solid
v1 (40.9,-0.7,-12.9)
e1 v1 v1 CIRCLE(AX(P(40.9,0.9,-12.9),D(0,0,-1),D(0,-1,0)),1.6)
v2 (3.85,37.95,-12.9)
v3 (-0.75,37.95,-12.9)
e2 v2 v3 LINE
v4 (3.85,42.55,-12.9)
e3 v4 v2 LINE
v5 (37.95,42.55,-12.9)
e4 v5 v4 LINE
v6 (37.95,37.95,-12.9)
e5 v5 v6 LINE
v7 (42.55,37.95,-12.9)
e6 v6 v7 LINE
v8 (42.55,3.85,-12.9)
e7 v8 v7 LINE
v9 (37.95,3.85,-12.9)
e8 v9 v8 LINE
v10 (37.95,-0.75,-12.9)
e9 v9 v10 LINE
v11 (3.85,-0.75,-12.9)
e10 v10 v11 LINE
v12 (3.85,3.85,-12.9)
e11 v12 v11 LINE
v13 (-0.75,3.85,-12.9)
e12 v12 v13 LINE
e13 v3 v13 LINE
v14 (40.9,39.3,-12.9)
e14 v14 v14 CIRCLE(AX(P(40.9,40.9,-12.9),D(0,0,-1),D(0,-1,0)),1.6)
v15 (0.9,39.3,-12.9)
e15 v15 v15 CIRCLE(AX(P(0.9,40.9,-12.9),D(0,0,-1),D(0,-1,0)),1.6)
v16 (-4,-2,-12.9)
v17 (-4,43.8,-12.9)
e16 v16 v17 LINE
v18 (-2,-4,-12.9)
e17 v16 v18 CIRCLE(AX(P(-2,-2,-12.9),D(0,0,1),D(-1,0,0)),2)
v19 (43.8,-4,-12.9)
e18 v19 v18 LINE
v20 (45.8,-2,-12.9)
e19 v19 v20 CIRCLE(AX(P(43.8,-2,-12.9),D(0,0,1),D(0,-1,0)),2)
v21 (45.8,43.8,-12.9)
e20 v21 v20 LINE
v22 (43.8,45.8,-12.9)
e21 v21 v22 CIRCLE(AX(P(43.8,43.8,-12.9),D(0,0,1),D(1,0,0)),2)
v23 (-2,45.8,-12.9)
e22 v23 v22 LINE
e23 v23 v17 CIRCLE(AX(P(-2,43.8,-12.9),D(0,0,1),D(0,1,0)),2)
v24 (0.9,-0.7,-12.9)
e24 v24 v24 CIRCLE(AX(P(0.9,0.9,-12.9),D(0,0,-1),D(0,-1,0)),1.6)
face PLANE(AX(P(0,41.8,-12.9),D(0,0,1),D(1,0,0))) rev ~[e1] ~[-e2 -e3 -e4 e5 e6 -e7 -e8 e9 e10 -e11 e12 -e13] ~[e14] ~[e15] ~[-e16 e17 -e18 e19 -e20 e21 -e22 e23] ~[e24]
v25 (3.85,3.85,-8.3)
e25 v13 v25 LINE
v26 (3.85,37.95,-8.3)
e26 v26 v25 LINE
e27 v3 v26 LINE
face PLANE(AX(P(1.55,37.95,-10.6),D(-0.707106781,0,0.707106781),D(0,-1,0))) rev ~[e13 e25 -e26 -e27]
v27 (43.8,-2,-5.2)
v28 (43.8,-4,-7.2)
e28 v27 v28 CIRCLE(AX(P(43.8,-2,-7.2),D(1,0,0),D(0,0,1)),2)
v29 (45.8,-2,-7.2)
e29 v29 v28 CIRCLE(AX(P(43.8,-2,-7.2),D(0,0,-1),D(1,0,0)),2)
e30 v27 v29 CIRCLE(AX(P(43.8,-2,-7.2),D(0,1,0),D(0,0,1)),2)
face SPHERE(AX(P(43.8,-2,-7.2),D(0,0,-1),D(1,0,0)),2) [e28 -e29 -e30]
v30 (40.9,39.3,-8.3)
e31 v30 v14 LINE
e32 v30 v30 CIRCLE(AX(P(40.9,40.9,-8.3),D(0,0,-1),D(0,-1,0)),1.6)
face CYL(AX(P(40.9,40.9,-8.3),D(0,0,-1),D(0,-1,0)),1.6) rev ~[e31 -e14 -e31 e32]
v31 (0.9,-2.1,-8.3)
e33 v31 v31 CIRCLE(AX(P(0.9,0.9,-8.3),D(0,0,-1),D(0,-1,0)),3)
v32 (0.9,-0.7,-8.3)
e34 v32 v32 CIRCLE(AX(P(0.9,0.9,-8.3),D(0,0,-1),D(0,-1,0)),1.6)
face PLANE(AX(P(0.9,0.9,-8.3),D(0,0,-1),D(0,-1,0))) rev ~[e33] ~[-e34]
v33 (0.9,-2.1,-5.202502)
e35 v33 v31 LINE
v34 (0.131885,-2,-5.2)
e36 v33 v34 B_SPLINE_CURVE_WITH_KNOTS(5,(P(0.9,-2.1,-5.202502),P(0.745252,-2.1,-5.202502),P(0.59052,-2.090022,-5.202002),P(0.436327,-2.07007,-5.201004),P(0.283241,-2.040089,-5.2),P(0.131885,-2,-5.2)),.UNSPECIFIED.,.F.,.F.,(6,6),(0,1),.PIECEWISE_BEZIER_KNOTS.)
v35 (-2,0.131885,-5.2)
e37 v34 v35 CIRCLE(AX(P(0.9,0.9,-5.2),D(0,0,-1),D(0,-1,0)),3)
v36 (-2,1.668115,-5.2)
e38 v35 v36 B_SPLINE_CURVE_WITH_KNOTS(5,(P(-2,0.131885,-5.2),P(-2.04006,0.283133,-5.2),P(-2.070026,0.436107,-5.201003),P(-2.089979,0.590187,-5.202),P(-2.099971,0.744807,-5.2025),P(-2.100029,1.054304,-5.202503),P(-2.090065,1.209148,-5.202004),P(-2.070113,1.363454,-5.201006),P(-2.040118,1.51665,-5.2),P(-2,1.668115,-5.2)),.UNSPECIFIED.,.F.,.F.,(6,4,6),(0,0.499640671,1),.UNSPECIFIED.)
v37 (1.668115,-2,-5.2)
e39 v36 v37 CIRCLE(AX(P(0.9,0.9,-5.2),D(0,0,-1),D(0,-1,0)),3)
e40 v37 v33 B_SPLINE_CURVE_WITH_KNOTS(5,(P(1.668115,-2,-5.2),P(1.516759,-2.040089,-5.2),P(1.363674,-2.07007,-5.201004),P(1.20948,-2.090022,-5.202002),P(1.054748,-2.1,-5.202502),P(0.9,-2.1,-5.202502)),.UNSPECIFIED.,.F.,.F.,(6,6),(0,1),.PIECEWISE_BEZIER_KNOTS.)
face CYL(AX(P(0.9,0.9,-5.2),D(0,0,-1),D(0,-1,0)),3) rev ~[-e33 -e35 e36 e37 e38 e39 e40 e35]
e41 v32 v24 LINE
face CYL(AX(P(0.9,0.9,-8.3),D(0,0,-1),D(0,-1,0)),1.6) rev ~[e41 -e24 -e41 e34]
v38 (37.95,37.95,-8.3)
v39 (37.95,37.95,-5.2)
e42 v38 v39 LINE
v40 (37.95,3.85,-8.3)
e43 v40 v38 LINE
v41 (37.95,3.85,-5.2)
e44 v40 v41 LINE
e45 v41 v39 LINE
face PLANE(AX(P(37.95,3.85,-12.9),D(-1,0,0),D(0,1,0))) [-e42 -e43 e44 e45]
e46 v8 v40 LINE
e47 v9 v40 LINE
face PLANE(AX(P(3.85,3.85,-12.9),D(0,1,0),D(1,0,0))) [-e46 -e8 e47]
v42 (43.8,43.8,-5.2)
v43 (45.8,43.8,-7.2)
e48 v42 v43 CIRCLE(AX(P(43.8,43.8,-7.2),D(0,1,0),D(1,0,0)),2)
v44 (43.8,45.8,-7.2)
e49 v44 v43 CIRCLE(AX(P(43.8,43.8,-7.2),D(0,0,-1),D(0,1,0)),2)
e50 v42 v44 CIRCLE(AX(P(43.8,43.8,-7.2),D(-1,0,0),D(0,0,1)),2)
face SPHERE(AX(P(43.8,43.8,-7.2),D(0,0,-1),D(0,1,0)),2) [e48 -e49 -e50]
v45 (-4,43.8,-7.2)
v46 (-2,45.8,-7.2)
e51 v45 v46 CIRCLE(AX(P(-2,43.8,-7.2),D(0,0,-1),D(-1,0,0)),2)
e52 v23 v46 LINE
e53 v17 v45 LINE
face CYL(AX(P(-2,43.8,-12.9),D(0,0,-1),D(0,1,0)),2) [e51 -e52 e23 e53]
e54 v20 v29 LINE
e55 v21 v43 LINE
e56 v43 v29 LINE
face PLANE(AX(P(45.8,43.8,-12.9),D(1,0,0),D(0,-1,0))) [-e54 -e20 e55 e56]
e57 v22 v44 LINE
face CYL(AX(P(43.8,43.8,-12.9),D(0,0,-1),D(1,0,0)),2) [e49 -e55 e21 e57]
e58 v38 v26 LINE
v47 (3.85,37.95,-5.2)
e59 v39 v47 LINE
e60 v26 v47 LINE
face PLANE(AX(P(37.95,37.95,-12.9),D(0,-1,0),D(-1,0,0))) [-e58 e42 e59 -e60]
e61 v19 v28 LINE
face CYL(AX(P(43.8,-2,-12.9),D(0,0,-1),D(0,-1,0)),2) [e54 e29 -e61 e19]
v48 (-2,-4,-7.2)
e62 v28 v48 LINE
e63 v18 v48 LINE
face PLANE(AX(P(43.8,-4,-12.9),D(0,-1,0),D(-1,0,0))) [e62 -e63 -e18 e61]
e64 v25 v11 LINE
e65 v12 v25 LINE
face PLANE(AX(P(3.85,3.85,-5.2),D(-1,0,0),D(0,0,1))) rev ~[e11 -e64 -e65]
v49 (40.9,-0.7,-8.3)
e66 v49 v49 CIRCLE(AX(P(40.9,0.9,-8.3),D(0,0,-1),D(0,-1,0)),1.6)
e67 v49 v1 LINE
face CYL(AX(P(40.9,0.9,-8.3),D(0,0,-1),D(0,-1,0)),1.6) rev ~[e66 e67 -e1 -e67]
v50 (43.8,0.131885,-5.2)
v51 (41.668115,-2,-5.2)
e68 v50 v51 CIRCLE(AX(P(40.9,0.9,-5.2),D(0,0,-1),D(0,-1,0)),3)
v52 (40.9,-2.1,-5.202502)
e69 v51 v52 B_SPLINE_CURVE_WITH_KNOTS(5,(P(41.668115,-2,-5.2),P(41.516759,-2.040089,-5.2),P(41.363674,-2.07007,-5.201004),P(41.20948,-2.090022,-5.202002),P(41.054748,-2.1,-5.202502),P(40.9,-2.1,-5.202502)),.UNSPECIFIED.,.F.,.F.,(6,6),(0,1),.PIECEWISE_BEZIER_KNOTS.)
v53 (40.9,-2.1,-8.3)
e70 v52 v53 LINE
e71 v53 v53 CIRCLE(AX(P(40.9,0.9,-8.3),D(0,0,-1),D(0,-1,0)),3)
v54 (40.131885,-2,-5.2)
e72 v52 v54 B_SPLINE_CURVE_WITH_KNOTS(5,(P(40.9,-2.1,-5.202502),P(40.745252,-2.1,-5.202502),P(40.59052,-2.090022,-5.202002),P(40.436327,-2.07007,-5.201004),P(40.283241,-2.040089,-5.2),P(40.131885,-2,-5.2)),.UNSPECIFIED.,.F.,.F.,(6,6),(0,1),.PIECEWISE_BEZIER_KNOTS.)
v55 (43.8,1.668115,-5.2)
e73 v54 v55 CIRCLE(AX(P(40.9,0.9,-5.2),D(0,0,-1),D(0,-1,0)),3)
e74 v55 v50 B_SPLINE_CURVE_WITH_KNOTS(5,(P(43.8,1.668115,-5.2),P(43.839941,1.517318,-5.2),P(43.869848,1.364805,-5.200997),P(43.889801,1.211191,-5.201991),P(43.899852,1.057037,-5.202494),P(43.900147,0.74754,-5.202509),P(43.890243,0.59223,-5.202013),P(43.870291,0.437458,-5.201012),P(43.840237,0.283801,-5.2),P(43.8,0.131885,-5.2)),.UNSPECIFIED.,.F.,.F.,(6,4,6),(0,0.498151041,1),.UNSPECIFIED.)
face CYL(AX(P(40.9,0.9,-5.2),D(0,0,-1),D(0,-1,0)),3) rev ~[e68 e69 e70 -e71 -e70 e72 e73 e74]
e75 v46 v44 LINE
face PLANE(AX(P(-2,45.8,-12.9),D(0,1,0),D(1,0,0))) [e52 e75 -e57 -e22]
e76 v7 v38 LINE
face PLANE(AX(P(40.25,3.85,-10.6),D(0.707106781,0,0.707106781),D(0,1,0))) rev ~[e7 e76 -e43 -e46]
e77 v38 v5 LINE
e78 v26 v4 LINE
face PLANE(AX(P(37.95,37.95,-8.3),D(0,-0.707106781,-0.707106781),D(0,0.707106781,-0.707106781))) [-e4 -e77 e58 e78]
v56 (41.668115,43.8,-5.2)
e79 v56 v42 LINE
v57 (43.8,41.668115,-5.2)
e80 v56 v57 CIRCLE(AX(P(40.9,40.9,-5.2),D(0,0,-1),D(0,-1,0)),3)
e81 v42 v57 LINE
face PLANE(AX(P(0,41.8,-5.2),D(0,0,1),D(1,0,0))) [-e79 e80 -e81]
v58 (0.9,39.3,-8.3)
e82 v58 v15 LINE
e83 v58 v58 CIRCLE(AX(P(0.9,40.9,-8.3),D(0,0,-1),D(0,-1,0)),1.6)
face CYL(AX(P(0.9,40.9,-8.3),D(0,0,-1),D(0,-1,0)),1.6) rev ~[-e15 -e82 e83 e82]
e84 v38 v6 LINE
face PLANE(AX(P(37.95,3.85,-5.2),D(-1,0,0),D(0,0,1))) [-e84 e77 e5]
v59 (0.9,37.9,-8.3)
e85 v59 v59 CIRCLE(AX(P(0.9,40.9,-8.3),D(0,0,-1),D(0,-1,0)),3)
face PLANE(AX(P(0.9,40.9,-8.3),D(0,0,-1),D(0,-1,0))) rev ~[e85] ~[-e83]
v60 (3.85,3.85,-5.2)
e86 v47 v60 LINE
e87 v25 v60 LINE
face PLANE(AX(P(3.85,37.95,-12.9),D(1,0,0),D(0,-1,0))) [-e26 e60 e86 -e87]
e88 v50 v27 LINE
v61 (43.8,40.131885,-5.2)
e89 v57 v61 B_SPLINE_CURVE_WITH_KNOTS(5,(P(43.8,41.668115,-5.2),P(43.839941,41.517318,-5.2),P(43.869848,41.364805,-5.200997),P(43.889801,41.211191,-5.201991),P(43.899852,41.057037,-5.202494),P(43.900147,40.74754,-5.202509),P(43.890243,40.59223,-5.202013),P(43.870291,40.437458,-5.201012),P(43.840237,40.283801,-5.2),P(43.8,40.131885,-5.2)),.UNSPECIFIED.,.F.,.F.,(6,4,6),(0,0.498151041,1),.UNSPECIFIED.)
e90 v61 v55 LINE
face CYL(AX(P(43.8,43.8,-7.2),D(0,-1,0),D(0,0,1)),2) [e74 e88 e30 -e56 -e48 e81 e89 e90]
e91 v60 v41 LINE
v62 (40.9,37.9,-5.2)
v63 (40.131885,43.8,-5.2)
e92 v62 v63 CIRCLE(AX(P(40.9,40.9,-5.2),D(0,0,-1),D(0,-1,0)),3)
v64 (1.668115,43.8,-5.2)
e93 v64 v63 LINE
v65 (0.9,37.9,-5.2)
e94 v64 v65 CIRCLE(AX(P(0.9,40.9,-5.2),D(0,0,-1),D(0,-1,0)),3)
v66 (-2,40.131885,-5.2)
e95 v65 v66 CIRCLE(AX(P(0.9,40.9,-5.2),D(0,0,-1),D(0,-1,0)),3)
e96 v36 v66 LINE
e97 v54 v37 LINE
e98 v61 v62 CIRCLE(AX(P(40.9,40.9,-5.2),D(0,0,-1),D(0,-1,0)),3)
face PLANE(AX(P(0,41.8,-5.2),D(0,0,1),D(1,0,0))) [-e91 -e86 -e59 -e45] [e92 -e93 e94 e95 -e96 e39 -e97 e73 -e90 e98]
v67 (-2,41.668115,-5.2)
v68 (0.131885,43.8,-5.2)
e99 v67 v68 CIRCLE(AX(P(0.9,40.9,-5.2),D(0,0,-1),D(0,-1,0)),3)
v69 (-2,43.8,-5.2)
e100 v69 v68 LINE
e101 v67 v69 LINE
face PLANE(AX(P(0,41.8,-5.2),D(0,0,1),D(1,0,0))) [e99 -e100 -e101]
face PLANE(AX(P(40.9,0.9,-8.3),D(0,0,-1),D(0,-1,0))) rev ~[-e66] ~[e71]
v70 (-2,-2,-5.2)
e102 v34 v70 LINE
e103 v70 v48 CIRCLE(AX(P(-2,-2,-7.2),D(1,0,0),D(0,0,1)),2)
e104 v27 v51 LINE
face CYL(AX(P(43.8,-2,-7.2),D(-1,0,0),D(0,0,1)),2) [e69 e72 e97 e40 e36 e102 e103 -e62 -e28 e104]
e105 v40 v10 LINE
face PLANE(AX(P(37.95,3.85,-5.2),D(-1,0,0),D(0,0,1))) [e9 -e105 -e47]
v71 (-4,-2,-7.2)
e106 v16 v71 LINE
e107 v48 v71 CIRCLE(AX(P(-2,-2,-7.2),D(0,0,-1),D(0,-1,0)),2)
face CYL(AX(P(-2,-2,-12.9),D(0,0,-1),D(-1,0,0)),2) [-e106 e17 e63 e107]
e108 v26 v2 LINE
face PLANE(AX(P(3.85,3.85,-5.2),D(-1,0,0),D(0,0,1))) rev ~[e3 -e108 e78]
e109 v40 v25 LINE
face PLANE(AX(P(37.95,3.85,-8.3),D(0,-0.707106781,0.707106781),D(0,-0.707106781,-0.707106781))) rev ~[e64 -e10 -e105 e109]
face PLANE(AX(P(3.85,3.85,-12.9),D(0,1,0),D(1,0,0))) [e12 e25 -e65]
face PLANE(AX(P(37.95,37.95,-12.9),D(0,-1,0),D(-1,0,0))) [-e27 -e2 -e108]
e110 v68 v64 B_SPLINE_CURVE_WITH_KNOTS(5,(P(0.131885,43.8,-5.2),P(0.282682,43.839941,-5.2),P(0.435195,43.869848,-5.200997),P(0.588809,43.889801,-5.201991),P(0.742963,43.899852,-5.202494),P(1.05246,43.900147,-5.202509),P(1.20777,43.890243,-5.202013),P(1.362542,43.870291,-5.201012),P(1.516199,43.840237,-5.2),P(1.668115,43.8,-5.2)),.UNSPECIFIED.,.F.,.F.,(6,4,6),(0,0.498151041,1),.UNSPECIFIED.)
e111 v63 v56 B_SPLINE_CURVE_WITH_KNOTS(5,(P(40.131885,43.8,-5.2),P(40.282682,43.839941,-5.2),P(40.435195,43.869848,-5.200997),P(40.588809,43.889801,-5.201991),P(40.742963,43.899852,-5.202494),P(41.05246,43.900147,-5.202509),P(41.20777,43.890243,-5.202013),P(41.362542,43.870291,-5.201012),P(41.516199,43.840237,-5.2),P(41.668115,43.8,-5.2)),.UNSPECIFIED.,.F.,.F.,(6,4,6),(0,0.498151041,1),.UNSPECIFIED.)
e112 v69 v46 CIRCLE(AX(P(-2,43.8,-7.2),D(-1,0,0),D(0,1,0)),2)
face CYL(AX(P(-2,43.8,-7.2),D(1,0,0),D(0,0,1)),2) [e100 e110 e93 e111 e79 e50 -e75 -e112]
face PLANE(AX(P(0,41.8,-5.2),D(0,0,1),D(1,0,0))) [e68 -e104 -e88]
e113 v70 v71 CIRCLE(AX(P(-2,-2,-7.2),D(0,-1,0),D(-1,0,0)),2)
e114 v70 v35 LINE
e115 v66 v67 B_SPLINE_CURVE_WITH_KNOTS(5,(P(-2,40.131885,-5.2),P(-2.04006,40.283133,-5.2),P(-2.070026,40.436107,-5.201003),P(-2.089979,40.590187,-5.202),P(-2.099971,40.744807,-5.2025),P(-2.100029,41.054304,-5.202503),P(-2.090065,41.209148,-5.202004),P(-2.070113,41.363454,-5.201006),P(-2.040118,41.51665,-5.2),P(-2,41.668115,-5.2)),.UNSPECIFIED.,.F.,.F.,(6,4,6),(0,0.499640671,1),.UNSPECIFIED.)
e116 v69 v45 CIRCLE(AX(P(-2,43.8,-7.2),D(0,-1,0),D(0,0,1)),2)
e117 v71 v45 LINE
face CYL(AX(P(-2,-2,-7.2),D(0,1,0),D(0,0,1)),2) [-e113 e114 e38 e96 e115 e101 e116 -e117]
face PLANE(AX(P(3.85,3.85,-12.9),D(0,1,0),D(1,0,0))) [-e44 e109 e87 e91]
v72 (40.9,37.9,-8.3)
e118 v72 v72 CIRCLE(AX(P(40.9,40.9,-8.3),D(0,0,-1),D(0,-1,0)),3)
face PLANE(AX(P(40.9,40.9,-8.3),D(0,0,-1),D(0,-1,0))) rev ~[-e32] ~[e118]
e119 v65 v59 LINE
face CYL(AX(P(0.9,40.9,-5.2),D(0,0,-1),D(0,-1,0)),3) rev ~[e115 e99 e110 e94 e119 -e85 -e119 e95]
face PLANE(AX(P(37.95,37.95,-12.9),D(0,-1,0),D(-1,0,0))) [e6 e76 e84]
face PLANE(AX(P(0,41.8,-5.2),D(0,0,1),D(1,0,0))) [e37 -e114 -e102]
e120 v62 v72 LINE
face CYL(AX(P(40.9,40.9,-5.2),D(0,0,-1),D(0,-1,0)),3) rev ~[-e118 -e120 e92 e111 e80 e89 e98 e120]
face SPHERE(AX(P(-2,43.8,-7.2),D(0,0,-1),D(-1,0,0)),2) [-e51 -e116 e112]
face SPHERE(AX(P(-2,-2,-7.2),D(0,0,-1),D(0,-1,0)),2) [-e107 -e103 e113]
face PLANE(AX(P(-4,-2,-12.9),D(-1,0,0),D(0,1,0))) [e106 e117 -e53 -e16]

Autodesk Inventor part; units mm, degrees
ref_plane "YZ Plane" through (0, 0, 0) normal (1, 0, 0) x (0, 1, 0)
ref_plane "XZ Plane" through (0, 0, 0) normal (0, 1, 0) x (-1, 0, 0)
ref_plane "Work Plane1" through (0, 41.8, -12.9) normal (0, 0, 1) x (1, 0, 0)
sketch "Sketch1" plane through (0, 41.8, -12.9) normal (0, 0, 1) x (1, 0, 0)
  line L0 (3.85, 0.3752) -> (3.85, 4) construction
  line L1 (3.85, 4) -> (-2, 4) construction
  arc A0 (-2, 4) -> (-4, 2) centre (-2, 2) ccw construction
  line L2 (-4, 2) -> (-4, -3.85) construction
  line L3 (-4, -3.85) -> (-0.3752, -3.85) construction
  line L4 (-2, 4) -> (43.8, 4)
  line L5 (45.8, 2) -> (45.8, -43.8)
  line L6 (43.8, -45.8) -> (-2, -45.8)
  line L7 (-4, -43.8) -> (-4, 2)
  line L8 (40.3, -37.8) -> (40.3, -4)
  line L9 (37.8, -1.5) -> (4, -1.5)
  line L10 (1.5, -4) -> (1.5, -37.8)
  line L11 (4, -40.3) -> (37.8, -40.3)
  line L12 (37.8, -40.3) -> (40.3, -37.8)
  line L13 (4, -40.3) -> (1.5, -37.8)
  line L14 (4, -1.5) -> (1.5, -4)
  line L15 (40.3, -4) -> (37.8, -1.5)
  arc A1 (45.8, 2) -> (43.8, 4) centre (43.8, 2) ccw
  arc A2 (43.8, -45.8) -> (45.8, -43.8) centre (43.8, -43.8) ccw
  arc A3 (-4, -43.8) -> (-2, -45.8) centre (-2, -43.8) ccw
  arc A4 (-2, 4) -> (-4, 2) centre (-2, 2) ccw
  circle A5 centre (1, -1) radius 1.4
  circle A6 centre (40.8, -1) radius 1.4
  circle A7 centre (40.8, -40.8) radius 1.4
  circle A8 centre (1, -40.8) radius 1.4
  circle A9 centre (20.9, -20.9) radius 19.4 construction
  line L16 (3.85, -3.85) -> (3.85, -37.95)
  line L17 (3.85, -37.95) -> (37.95, -37.95)
  line L18 (37.95, -37.95) -> (37.95, -3.85)
  line L19 (37.95, -3.85) -> (3.85, -3.85)
  arc A10 (2.2654, -1.2094) -> (1.2094, -2.2654) centre (0.9, -0.9) ccw projected
  line L20 (2.2654, -1.2094) -> (3.85, 0.3752) projected
  line L21 (-0.3752, -3.85) -> (1.2094, -2.2654) projected
  point P0 (45.8, -45.8)
  point P1 (45.8, 4)
  point P2 (-4, -45.8)
  point P3 (40.3, -40.3)
  point P4 (40.3, -1.5)
  point P5 (1.5, -1.5)
  point P6 (1.5, -40.3)
  point P7 (40.8, -1)
  dimension "d55" = 2.8
  dimension "d34" = 49.8
  dimension "d35" = 49.8
  dimension "d36" = 5.5
  dimension "d37" = 2.5
  dimension "d38" = 2.5
  dimension "d39" = 2.5
  dimension "d40" = 2.5
  dimension "d41" = 2.5
  dimension "d42" = 2.5
  dimension "d43" = 2.5
  dimension "d44" = 2.5
  dimension "d45" = 2
  dimension "d46" = 5
  dimension "d47" = 5
  dimension "d48" = 5
  dimension "d49" = 5
  dimension "d51" = 5
  dimension "d52" = 0.5
  dimension "d53" = 5
  dimension "d54" = 5
  dimension "d56" = 2.8
  dimension "d57" = 2.8
  dimension "d58" = 2.8
  dimension "d90" = 7.85
extrude "Extrusion1" add sketch "Sketch1" along normal blind 7.7 contours L4 A1 L5 A2 L6 A3 L7 A4 | L12 L11 L13 L10 L14 L9 L15 L8 | A5 A10
fillet "Fillet1" radius 2 8 edges at (20.9, -4, -5.2) (45.2142, -3.4142, -5.2) (45.8, 20.9, -5.2) (45.2142, 45.2142, -5.2) (20.9, 45.8, -5.2) (-3.4142, 45.2142, -5.2) (-4, 20.9, -5.2) (-3.4142, -3.4142, -5.2)
sketch "Sketch3" plane through (0, 41.8, -5.2) normal (0, 0, 1) x (1, 0, 0)
  circle A0 centre (20.9, -20.9) radius 16.9 construction
  point P0 (0, -41.8)
sketch "Sketch4" plane through (0, 41.8, -5.2) normal (0, 0, 1) x (1, 0, 0)
  line L0 (37.95, -37.95) -> (37.95, -3.85) projected
  line L1 (37.95, -3.85) -> (3.85, -3.85) projected
  line L2 (3.85, -3.85) -> (3.85, -37.95) projected
  line L3 (3.85, -37.95) -> (37.95, -37.95) projected
  circle A0 centre (40.9, -0.9) radius 2.75 projected
  circle A1 centre (0.9, -40.9) radius 2.75 projected
  circle A2 centre (0.9, -0.9) radius 2.75 projected
  circle A3 centre (40.9, -40.9) radius 2.75 projected
  line L4 (34.3452, 2) -> (7.4548, 2) projected
  line L5 (43.8, -34.3452) -> (43.8, -7.4548) projected
  line L6 (7.4548, -43.8) -> (34.3452, -43.8) projected
  line L7 (-2, -7.4548) -> (-2, -34.3452) projected
  arc A4 (34.3452, 2) -> (36.4548, 2) centre (35.4, -0.1) ccw projected
  line L8 (43.8, 2) -> (36.4548, 2) projected
  line L9 (43.8, -5.3452) -> (43.8, 2) projected
  arc A5 (43.8, -5.3452) -> (43.8, -7.4548) centre (41.7, -6.4) ccw projected
  arc A6 (43.8, -34.3452) -> (43.8, -36.4548) centre (41.7, -35.4) ccw projected
  line L10 (43.8, -43.8) -> (43.8, -36.4548) projected
  line L11 (36.4548, -43.8) -> (43.8, -43.8) projected
  arc A7 (36.4548, -43.8) -> (34.3452, -43.8) centre (35.4, -41.7) ccw projected
  arc A8 (7.4548, -43.8) -> (5.3452, -43.8) centre (6.4, -41.7) ccw projected
  line L12 (-2, -43.8) -> (5.3452, -43.8) projected
  line L13 (-2, -36.4548) -> (-2, -43.8) projected
  arc A9 (-2, -36.4548) -> (-2, -34.3452) centre (0.1, -35.4) ccw projected
  arc A10 (-2, -7.4548) -> (-2, -5.3452) centre (0.1, -6.4) ccw projected
  line L14 (-2, 2) -> (-2, -5.3452) projected
  line L15 (5.3452, 2) -> (-2, 2) projected
  arc A11 (5.3452, 2) -> (7.4548, 2) centre (6.4, -0.1) ccw projected
hole "Hole2" at (40.9, 40.9, -5.2) at (40.9, 0.9, -5.2) at (0.9, 0.9, -5.2) at (0.9, 40.9, -5.2) direction (0, 0, -1) diameter 3.2 depth 12 tip angle 118 counterbore diameter 6 counterbore depth 3.1
chamfer "Chamfer2" distance 4.6 angle 45 2 edges at (3.85, 20.9, -12.9) (37.95, 20.9, -12.9)
sketch "Sketch9" plane through (37.95, 3.85, -5.2) normal (-1, 0, 0) x (0, 0, 1)
  line L0 (-7.7, 0) -> (-3.1, 0) projected
  line L1 (-3.1, 34.1) -> (-7.7, 34.1) projected
  line L2 (-3.1, 0) -> (-7.7, -4.6)
  line L3 (-7.7, 39.95) -> (-7.7, -5.85) projected
  line L4 (-3.1, 0) -> (3.4054, 0) construction
  line L5 (-7.7, -4.6) -> (-7.7, 0)
  line L6 (-3.1, 34.1) -> (-7.7, 38.7)
  line L7 (-3.1, 34.1) -> (3.4054, 34.1) construction
  line L8 (-7.7, 38.7) -> (-7.7, 34.1)
  line L9 (-7.7, 34.1) -> (-3.1, 34.1)
  point P0 (5.2, -3.85)
  point P1 (-7.7, -5.85)
  dimension "d91" = 135
  dimension "d92" = 135
extrude "Extrusion3" cut sketch "Sketch9" along normal up to surface (34.1 mm away)
sketch "Sketch14" plane through (0, 41.8, -5.2) normal (0, 0, 1) x (1, 0, 0)
  arc A0 (1.6681, -43.8) -> (-2, -40.1319) centre (0.9, -40.9) ccw construction
  line L0 (40.1319, -43.8) -> (1.6681, -43.8) construction
  arc A1 (43.8, -40.1319) -> (40.1319, -43.8) centre (40.9, -40.9) ccw construction
  line L1 (43.8, -1.6681) -> (43.8, -40.1319) construction
  arc A2 (40.1319, 2) -> (43.8, -1.6681) centre (40.9, -0.9) ccw construction
  line L2 (1.6681, 2) -> (40.1319, 2) construction
  arc A3 (-2, -1.6681) -> (1.6681, 2) centre (0.9, -0.9) ccw construction
  line L3 (-2, -40.1319) -> (-2, -1.6681) construction
  line L4 (3.85, -3.85) -> (37.95, -3.85) construction
  line L5 (37.95, -3.85) -> (37.95, -37.95) construction
  line L6 (37.95, -37.95) -> (3.85, -37.95) construction
  line L7 (3.85, -37.95) -> (3.85, -3.85) construction
  point P0 (0, -41.8)
  point P1 (6.4, -0.1)
  point P2 (0.1, -6.4)
  point P3 (0.1, -35.4)
  point P4 (6.4, -41.7)
  point P5 (35.4, -41.7)
  point P6 (41.7, -35.4)
  point P7 (41.7, -6.4)
  point P8 (35.4, -0.1)
hole "Hole6" [suppressed]
ref_plane "Work Plane5" through (20.9, -2, -12.9) normal (-1, 0, 0) x (0, 0, 1)
ref_plane "Work Plane6" through (-2, 20.9, -12.9) normal (0, -1, 0) x (1, 0, 0)
equation "\"d38\" = d37"
equation "\"d39\" = d37"
equation "\"d40\" = d39"
equation "\"d41\" = d37"
equation "\"d42\" = d41"
equation "\"d43\" = d37"
equation "\"d44\" = d43"
properties part number "10_Lid_1x1_v3"
